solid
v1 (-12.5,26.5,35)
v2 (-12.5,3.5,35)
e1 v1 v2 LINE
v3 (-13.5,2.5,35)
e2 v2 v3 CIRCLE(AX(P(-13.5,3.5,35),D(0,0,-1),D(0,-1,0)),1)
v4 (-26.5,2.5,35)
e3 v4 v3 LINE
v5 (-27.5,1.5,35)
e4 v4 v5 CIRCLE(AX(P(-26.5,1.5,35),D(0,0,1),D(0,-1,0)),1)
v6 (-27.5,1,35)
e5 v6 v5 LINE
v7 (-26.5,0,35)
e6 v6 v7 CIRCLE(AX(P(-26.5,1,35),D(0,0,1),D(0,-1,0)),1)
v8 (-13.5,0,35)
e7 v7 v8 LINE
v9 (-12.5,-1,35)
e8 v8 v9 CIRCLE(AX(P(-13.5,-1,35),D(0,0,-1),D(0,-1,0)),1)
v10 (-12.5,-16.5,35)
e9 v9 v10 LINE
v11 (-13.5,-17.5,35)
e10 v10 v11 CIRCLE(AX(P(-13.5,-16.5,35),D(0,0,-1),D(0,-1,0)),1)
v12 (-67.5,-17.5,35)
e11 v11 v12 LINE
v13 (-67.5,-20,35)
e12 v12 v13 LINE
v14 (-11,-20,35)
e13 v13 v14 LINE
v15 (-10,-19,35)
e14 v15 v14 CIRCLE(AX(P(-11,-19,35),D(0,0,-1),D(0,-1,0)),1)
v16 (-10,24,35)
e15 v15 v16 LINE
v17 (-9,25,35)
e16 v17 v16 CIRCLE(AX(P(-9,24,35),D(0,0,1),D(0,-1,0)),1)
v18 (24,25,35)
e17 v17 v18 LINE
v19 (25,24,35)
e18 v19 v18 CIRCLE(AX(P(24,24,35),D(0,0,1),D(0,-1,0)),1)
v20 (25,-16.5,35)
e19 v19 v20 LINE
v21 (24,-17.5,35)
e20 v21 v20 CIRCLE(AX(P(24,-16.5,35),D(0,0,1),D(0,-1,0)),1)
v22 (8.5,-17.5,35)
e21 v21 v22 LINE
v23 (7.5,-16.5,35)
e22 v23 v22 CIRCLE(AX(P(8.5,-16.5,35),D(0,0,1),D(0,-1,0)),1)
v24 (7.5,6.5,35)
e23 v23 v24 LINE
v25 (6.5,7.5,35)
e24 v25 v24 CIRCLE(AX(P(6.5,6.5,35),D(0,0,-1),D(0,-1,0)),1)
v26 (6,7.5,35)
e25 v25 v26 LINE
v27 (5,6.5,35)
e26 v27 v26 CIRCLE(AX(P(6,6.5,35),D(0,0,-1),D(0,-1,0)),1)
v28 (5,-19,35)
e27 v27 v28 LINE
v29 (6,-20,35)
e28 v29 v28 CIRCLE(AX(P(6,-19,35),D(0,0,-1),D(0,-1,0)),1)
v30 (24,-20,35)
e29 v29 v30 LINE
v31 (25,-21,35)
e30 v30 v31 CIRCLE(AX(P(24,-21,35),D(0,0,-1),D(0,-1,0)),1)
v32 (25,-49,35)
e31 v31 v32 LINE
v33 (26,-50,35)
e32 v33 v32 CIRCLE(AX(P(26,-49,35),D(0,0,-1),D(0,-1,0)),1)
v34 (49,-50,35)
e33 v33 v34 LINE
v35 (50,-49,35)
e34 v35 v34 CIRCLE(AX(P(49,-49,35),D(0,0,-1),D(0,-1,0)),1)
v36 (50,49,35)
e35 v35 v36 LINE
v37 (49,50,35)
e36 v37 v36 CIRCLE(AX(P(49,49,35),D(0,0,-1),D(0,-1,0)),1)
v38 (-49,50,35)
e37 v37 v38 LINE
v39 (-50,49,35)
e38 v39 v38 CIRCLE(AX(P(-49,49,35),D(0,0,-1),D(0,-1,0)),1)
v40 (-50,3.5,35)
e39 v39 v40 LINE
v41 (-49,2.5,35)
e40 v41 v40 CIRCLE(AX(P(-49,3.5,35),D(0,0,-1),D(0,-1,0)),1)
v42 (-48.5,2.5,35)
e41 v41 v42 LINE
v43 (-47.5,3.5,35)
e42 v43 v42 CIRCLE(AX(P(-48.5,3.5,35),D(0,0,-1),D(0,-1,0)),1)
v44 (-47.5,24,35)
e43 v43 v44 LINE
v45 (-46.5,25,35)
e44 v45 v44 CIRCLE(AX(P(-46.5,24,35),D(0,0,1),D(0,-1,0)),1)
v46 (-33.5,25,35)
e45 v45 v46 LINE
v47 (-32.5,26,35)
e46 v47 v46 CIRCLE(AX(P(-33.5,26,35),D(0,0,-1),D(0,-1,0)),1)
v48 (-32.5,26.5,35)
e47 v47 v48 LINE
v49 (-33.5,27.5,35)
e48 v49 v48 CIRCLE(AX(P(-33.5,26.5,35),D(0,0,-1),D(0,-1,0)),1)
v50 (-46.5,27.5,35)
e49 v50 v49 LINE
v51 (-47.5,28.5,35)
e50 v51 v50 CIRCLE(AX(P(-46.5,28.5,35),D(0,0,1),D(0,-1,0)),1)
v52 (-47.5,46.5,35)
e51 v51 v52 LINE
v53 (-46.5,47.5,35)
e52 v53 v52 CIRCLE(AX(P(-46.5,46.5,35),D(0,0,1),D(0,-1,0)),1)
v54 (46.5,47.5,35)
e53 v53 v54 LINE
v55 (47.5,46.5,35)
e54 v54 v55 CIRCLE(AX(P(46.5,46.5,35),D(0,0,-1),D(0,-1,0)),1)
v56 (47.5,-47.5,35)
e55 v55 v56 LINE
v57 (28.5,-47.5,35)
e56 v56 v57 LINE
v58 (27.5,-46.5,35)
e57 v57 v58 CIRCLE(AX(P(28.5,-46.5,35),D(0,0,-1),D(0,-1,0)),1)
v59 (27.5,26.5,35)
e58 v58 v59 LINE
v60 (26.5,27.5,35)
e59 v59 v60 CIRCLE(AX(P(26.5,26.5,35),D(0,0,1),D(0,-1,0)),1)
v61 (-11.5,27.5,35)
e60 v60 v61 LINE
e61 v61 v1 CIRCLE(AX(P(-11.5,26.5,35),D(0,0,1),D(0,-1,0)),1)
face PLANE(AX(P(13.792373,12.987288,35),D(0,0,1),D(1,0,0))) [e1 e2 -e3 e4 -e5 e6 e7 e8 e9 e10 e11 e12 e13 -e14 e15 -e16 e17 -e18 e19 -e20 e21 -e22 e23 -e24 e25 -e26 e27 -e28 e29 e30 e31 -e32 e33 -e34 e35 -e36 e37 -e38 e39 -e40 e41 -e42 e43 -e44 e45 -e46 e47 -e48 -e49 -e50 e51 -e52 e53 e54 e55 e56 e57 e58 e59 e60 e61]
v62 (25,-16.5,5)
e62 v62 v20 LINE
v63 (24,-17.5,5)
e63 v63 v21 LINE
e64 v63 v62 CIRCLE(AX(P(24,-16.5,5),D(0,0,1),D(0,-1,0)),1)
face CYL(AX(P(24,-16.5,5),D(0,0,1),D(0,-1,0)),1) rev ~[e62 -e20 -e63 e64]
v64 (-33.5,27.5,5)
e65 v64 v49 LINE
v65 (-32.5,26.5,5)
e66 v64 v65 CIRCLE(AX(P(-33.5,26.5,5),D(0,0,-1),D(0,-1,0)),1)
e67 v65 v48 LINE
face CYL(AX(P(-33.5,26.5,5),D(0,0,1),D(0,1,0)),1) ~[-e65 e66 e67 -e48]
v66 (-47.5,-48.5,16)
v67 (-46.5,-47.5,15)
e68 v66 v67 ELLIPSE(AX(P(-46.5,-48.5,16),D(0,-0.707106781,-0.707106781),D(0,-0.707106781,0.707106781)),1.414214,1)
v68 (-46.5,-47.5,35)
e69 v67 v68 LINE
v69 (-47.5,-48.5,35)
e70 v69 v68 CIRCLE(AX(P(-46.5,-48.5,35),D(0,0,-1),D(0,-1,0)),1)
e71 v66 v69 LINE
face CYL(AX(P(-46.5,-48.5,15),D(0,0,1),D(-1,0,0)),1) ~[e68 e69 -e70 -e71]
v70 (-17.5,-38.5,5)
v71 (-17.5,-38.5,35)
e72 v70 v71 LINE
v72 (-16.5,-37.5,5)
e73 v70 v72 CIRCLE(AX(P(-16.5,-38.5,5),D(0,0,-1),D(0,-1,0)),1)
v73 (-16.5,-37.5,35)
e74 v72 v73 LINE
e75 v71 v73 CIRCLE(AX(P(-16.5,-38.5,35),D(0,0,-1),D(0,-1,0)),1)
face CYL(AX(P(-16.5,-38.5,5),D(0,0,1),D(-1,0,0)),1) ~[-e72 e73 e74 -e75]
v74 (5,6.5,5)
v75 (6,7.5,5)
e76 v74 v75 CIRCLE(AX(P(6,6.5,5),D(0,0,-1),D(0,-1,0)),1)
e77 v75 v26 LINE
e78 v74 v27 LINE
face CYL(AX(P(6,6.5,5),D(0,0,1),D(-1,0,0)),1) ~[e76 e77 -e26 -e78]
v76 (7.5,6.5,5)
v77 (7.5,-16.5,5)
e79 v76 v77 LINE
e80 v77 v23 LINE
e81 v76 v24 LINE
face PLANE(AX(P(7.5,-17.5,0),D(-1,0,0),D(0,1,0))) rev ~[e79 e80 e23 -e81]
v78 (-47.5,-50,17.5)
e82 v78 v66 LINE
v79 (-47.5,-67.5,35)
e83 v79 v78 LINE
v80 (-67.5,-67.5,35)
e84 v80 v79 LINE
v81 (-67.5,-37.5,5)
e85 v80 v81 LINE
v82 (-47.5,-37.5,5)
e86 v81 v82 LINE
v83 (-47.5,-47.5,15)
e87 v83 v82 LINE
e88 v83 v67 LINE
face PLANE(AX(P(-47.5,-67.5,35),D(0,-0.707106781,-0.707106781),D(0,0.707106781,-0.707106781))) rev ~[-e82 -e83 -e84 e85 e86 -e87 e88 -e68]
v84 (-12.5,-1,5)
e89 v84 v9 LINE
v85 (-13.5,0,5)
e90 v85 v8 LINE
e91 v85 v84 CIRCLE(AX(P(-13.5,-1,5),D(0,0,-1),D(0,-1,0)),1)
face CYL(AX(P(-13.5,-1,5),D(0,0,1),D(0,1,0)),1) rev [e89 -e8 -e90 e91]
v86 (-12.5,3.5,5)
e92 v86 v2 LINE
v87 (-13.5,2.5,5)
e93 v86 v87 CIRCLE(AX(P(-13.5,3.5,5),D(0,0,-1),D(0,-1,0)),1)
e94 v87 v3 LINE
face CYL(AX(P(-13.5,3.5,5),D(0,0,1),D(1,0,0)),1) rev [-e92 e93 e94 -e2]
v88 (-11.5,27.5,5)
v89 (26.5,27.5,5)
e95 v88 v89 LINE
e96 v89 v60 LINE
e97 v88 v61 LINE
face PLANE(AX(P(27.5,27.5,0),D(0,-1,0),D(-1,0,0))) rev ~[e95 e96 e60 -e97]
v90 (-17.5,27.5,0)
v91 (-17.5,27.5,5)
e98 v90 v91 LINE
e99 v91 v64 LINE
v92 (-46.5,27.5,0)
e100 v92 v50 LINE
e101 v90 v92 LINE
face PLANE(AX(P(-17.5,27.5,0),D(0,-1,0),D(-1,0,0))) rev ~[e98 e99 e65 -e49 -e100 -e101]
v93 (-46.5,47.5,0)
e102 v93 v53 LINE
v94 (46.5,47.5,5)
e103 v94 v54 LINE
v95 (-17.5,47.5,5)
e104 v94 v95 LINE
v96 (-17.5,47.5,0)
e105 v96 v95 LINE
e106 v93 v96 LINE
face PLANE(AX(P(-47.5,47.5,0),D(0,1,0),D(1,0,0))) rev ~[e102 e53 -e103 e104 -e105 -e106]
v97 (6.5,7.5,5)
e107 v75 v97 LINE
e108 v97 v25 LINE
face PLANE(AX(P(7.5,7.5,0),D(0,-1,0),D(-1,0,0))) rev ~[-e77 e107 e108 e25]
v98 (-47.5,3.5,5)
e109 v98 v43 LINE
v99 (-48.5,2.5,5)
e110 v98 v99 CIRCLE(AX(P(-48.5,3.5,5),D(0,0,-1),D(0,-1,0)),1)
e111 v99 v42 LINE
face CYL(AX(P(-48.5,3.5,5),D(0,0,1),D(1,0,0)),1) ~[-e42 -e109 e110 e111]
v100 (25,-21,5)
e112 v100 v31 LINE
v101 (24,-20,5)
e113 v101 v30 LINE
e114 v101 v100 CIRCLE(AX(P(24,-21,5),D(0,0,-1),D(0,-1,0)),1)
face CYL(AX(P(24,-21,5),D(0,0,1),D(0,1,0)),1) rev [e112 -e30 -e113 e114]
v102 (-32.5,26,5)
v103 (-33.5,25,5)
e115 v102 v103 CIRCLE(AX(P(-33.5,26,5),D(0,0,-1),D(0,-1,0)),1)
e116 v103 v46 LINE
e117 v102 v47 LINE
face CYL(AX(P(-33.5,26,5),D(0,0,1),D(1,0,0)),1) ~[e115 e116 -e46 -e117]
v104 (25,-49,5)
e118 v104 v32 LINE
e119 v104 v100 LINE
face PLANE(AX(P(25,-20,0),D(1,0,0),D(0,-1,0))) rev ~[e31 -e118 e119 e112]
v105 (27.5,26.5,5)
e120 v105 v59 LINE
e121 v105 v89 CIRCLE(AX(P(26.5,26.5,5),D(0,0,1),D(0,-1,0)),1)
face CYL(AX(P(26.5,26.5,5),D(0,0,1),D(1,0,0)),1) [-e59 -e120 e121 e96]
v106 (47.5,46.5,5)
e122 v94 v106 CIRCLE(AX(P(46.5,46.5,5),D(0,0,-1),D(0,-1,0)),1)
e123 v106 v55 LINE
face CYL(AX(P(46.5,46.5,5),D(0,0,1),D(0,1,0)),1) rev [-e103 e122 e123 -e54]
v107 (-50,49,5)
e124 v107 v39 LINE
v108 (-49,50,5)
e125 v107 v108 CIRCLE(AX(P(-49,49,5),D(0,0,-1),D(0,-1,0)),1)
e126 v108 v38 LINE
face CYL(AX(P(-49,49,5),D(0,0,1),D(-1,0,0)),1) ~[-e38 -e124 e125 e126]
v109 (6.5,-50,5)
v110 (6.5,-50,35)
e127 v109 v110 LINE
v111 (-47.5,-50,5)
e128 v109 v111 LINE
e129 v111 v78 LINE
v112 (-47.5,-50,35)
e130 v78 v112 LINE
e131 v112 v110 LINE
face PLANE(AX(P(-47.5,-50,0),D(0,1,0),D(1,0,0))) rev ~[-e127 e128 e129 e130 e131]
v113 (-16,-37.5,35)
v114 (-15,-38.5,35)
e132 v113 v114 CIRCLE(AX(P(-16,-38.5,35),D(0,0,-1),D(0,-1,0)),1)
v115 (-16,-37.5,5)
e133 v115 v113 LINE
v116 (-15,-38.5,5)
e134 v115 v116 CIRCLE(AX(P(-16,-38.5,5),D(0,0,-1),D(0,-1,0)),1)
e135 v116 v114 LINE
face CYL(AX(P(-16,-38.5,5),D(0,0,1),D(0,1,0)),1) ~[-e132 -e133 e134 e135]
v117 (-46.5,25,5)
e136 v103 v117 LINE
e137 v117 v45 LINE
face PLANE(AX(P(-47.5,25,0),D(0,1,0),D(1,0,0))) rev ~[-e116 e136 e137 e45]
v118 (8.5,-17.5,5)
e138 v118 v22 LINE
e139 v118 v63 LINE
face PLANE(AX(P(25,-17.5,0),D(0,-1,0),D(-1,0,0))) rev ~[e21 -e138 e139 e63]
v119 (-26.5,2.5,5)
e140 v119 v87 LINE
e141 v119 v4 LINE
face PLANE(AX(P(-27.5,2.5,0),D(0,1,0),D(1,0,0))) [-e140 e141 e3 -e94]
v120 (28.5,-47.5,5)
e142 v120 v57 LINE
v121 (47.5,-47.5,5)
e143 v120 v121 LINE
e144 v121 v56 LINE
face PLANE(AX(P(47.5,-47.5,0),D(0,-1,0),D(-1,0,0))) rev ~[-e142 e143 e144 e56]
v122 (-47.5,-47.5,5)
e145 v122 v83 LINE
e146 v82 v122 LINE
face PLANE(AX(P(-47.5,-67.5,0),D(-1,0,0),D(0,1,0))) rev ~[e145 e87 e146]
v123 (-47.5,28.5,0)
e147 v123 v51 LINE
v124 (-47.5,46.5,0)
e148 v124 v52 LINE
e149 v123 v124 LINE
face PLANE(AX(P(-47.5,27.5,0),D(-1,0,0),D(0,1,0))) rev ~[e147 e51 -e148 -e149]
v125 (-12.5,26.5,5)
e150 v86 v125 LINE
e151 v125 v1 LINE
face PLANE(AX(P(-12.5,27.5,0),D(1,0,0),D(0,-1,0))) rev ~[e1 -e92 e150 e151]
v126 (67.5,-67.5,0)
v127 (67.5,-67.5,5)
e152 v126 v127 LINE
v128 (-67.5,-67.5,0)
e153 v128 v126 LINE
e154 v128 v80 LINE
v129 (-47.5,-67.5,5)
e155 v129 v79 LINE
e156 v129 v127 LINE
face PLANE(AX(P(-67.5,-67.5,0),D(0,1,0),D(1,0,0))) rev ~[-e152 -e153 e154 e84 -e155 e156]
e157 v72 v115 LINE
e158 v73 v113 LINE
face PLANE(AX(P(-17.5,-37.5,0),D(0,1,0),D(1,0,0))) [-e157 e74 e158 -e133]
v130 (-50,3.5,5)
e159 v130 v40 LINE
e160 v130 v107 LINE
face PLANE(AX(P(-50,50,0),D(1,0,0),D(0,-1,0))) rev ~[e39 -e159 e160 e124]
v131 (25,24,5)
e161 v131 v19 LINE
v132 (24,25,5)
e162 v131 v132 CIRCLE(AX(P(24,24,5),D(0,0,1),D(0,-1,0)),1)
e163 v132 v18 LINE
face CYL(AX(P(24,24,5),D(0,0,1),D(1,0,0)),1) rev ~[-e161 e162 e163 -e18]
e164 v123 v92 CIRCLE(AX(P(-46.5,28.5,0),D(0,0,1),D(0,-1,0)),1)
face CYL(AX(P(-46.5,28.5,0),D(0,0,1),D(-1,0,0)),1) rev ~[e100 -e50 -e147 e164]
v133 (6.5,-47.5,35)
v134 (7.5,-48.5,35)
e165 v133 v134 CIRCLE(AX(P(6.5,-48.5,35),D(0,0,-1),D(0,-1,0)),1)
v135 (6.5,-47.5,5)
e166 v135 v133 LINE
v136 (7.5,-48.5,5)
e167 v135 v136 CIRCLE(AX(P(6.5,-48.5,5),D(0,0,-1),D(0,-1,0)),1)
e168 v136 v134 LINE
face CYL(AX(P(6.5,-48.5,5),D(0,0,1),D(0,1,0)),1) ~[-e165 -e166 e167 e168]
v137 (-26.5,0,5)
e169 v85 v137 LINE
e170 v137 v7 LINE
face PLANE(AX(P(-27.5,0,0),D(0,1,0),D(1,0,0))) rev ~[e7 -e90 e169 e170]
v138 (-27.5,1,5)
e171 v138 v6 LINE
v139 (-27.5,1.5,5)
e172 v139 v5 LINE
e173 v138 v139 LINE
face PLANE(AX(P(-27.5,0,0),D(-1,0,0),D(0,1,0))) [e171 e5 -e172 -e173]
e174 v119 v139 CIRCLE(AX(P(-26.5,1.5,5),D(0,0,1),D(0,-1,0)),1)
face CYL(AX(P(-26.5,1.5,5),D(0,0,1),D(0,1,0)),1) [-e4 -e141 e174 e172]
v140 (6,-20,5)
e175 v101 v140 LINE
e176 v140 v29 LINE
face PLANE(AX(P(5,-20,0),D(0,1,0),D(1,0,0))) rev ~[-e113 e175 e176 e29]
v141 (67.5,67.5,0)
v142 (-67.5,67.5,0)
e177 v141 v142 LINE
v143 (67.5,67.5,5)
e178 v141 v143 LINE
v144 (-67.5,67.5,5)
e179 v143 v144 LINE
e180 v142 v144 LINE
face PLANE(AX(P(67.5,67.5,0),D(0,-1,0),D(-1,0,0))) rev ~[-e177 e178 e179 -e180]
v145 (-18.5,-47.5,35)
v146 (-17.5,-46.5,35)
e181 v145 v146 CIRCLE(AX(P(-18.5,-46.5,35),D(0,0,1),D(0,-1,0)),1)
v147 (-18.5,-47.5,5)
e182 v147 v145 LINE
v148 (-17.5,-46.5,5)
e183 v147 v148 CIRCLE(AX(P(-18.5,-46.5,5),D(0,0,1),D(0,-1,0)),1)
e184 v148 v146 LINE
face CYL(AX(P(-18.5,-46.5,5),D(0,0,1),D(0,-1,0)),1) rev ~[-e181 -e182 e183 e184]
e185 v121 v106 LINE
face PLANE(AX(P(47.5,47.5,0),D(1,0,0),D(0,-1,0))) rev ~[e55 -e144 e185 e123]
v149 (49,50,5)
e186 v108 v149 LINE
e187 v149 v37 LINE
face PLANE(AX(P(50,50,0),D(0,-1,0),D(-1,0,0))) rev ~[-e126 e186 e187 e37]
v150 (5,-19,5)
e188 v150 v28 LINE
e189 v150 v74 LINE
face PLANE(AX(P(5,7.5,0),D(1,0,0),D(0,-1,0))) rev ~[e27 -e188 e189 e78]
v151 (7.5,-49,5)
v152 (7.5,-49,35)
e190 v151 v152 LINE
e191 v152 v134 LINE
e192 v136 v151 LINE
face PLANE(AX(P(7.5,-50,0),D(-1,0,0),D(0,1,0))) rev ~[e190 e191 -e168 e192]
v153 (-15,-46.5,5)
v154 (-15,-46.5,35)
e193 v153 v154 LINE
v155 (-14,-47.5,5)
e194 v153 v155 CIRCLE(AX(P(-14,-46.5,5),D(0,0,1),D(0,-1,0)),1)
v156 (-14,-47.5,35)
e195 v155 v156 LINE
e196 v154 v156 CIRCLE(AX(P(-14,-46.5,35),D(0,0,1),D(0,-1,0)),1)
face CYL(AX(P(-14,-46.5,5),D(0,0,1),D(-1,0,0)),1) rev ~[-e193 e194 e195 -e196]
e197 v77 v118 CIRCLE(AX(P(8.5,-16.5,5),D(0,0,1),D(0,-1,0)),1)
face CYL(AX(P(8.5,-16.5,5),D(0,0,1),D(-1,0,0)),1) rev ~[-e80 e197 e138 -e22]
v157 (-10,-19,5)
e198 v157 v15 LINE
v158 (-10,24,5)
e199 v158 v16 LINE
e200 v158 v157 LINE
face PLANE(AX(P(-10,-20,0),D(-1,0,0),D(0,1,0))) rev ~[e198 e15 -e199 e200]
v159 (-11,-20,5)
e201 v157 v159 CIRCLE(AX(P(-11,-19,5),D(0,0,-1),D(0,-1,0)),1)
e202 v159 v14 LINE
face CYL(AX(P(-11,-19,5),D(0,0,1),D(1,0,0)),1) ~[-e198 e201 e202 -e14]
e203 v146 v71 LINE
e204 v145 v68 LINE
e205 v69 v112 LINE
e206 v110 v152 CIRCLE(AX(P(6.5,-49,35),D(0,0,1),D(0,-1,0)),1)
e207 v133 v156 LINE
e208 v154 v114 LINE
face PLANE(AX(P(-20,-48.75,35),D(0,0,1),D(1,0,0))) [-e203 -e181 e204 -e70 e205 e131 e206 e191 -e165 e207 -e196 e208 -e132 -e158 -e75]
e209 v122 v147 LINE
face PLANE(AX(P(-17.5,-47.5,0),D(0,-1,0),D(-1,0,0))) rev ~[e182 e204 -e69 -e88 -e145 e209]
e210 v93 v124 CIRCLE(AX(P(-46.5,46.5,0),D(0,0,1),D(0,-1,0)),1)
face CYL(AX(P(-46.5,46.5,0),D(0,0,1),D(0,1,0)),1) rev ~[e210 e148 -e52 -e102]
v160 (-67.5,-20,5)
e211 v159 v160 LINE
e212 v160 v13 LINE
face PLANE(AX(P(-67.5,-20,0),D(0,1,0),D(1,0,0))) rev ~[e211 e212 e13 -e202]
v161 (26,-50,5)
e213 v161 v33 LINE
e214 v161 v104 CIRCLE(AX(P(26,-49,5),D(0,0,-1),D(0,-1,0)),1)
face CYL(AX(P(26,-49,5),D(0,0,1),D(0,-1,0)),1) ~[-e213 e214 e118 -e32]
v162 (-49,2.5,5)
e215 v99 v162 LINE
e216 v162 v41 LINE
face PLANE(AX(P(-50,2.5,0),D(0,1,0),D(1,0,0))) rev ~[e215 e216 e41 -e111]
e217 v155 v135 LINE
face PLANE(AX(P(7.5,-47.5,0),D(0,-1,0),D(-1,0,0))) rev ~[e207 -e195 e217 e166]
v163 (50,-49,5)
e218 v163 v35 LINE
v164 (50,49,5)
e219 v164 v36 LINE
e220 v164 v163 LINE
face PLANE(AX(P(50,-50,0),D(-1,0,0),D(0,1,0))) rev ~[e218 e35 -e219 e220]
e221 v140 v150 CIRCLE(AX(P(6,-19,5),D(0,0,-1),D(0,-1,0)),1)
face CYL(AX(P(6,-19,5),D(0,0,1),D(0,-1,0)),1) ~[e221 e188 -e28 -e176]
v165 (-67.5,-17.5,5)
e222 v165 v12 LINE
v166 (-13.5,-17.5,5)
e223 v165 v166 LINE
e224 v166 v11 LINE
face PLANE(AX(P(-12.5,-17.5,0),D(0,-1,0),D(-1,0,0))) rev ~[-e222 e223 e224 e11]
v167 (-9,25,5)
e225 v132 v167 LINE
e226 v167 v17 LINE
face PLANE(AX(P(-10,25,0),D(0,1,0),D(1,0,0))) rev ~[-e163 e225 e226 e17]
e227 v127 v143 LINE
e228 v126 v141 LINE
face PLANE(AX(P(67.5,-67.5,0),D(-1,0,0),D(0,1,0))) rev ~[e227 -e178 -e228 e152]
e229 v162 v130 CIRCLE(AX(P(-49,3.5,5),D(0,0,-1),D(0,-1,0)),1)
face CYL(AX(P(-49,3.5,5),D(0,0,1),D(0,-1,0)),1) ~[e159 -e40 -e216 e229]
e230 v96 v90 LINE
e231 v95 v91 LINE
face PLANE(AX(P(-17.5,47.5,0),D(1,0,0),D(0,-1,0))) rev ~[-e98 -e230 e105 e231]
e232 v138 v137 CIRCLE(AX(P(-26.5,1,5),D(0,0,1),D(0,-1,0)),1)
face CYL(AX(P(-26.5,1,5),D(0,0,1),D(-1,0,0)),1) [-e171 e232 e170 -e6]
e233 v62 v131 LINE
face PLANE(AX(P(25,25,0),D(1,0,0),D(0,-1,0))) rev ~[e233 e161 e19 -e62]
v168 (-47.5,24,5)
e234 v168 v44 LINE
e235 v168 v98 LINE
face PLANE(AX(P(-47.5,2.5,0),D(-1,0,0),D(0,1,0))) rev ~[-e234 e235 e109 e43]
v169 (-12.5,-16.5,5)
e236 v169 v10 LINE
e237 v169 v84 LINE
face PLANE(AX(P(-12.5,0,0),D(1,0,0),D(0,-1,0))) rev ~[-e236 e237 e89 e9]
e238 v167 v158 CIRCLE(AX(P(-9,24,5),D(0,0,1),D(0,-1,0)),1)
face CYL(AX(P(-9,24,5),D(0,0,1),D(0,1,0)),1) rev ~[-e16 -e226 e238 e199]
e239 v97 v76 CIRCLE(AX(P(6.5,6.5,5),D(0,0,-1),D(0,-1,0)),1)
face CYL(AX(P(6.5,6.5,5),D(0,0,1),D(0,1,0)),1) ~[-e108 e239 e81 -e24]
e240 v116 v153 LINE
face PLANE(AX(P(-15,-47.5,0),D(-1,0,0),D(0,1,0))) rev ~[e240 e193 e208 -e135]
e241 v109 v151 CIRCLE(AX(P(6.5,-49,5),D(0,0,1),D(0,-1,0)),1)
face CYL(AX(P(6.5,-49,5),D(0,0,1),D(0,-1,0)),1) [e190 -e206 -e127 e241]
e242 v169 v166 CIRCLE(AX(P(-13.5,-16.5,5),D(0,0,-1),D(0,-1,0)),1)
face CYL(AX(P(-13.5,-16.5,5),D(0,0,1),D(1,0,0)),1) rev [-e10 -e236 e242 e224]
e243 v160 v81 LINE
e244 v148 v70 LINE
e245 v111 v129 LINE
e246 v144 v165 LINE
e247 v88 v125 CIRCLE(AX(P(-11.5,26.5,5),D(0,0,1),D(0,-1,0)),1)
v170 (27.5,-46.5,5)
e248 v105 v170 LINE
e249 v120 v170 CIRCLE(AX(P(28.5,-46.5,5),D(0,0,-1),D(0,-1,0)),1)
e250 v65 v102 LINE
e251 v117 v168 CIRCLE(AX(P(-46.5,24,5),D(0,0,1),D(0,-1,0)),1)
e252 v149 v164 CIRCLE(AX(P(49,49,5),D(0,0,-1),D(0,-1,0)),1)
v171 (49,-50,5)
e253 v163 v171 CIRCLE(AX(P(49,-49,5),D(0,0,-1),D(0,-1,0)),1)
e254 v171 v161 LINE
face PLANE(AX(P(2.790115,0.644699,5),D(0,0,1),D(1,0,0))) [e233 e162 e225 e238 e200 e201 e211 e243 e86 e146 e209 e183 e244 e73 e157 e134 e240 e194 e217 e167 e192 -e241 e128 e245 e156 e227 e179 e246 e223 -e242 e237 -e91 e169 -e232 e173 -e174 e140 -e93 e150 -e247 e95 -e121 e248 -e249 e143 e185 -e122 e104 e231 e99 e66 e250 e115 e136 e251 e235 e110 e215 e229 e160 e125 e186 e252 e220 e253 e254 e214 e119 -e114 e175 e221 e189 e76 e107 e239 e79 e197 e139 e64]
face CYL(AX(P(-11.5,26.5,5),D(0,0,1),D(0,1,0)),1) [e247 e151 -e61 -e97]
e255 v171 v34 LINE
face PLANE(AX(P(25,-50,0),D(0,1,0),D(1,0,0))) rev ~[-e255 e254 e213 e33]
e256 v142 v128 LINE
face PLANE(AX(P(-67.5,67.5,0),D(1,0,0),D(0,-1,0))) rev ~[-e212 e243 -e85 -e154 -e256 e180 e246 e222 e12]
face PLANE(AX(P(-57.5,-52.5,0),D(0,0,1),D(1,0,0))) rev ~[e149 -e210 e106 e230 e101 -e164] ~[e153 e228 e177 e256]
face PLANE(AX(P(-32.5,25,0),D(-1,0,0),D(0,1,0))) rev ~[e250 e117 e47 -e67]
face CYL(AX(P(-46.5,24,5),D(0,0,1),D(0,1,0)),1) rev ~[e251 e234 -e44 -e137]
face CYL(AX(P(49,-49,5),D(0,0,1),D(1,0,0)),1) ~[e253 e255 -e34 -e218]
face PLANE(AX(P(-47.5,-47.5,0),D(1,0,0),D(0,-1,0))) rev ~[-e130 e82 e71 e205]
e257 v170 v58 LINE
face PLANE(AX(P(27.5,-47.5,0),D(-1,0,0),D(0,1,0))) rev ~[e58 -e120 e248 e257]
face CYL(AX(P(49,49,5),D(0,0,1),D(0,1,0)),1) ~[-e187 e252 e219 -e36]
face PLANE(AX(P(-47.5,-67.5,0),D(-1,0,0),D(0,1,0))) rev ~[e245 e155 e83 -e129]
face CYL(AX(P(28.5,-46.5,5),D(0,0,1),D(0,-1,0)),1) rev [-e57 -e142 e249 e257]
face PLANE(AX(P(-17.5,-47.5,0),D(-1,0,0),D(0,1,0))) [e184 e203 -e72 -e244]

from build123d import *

# Parameters (mm, degrees)
F1_DEPTH = 5
F2_DEPTH = 35
F4_DEPTH = 25
F0_W     = 15
F0_H     = 2.5
F0_W_2   = 2.5
F0_H_2   = 10
F5_DEPTH = 35
F6_R     = 1


# Not quite as in the source:
# - two fillets or chamfers of one size are made in one step


with BuildPart() as f1:
    # F0 (on Top) → F1 (new body)
    with BuildSketch(Plane.XY):
        Polygon((67.5, 67.5), (-67.5, 67.5), (-67.5, -17.5), (-12.5, -17.5), (-12.5, 0), (-27.5, 0), (-27.5, 2.5), (-12.5, 2.5), (-12.5, 25), (-12.5, 27.5), (-10, 27.5), (27.5, 27.5), (27.5, -17.5), (27.5, -20), (27.5, -47.5), (47.5, -47.5), (47.5, 47.5), (-17.5, 47.5), (-17.5, 27.5), (-32.5, 27.5), (-32.5, 25), (-47.5, 25), (-47.5, 2.5), (-50, 2.5), (-50, 50), (50, 50), (50, -50), (25, -50), (25, -20), (5, -20), (5, 7.5), (7.5, 7.5), (7.5, -17.5), (25, -17.5), (25, 25), (-10, 25), (-10, -20), (-67.5, -20), (-67.5, -37.5), (-47.5, -37.5), (-47.5, -47.5), (-17.5, -47.5), (-17.5, -37.5), (-15, -37.5), (-15, -47.5), (7.5, -47.5), (7.5, -50), (-47.5, -50), (-47.5, -67.5), (67.5, -67.5), align=None)
    extrude(amount=F1_DEPTH)

    # F0 (on Top) → F2 (join)
    with BuildSketch(Plane.XY):
        Polygon((-67.5, -67.5), (-47.5, -67.5), (-47.5, -50), (-47.5, -47.5), (-47.5, -37.5), (-67.5, -37.5), align=None)
    extrude(amount=F2_DEPTH)

    # F3 (on face) → F4 (cut)
    with BuildSketch(Plane.YZ.offset(-47.5)):
        Polygon((-37.5, 35), (-67.5, 35), (-37.5, 5), align=None)
    extrude(amount=-F4_DEPTH, mode=Mode.SUBTRACT)

    # F0 (on Top) → F5 (join)
    with BuildSketch(Plane.XY):
        Polygon((27.5, -20), (25, -20), (25, -50), (50, -50), (50, 50), (-50, 50), (-50, 2.5), (-47.5, 2.5), (-47.5, 25), (-47.5, 27.5), (-47.5, 47.5), (-17.5, 47.5), (47.5, 47.5), (47.5, -47.5), (27.5, -47.5), align=None)
        Polygon((-47.5, -47.5), (-47.5, -50), (7.5, -50), (7.5, -47.5), (-15, -47.5), (-17.5, -47.5), align=None)
        Polygon((-12.5, -17.5), (-67.5, -17.5), (-67.5, -20), (-10, -20), (-10, 25), (-12.5, 25), (-12.5, 2.5), (-12.5, 0), align=None)
        with Locations((-20, 1.25)):
            Rectangle(F0_W, F0_H)
        with Locations((-40, 26.25)):
            Rectangle(F0_W, F0_H)
        Polygon((-10, 27.5), (-10, 25), (25, 25), (25, -17.5), (27.5, -17.5), (27.5, 27.5), align=None)
        with Locations((-11.25, 26.25)):
            Rectangle(F0_W_2, F0_H)
        Polygon((25, -20), (25, -17.5), (7.5, -17.5), (7.5, 7.5), (5, 7.5), (5, -20), align=None)
        with Locations((26.25, -18.75)):
            Rectangle(F0_W_2, F0_H)
        with Locations((-16.25, -42.5)):
            Rectangle(F0_W_2, F0_H_2)
    extrude(amount=F5_DEPTH)

    # F6
    f6_edges = [f1.edges().sort_by_distance(p)[0] for p in [
        (7.5, -50, 20),
        (7.5, -47.5, 20),
        (-10, -20, 20),
        (-15, -37.5, 20),
        (5, -20, 20),
        (25, -50, 20),
        (50, -50, 20),
        (27.5, 27.5, 20),
        (50, 50, 20),
        (-47.5, 47.5, 17.5),
        (-27.5, 0, 20),
        (-47.5, 25, 20),
        (-32.5, 25, 20),
        (-32.5, 27.5, 20),
        (-10, 25, 20),
        (7.5, 7.5, 20),
        (-47.5, 2.5, 20),
        (-50, 2.5, 20),
        (-47.5, -47.5, 25),
        (-50, 50, 20),
        (25, -20, 20),
        (-12.5, 2.5, 20),
        (25, -17.5, 20),
        (-12.5, -17.5, 20),
        (27.5, -47.5, 20),
        (-12.5, 27.5, 20),
        (-47.5, 27.5, 17.5),
        (7.5, -17.5, 20),
        (-17.5, -37.5, 20),
        (25, 25, 20),
        (-15, -47.5, 20),
        (-17.5, -47.5, 20),
        (5, 7.5, 20),
        (47.5, 47.5, 20),
        (-27.5, 2.5, 20),
        (-12.5, 0, 20),
    ]]
    fillet(f6_edges, radius=F6_R)


solid = f1.part
